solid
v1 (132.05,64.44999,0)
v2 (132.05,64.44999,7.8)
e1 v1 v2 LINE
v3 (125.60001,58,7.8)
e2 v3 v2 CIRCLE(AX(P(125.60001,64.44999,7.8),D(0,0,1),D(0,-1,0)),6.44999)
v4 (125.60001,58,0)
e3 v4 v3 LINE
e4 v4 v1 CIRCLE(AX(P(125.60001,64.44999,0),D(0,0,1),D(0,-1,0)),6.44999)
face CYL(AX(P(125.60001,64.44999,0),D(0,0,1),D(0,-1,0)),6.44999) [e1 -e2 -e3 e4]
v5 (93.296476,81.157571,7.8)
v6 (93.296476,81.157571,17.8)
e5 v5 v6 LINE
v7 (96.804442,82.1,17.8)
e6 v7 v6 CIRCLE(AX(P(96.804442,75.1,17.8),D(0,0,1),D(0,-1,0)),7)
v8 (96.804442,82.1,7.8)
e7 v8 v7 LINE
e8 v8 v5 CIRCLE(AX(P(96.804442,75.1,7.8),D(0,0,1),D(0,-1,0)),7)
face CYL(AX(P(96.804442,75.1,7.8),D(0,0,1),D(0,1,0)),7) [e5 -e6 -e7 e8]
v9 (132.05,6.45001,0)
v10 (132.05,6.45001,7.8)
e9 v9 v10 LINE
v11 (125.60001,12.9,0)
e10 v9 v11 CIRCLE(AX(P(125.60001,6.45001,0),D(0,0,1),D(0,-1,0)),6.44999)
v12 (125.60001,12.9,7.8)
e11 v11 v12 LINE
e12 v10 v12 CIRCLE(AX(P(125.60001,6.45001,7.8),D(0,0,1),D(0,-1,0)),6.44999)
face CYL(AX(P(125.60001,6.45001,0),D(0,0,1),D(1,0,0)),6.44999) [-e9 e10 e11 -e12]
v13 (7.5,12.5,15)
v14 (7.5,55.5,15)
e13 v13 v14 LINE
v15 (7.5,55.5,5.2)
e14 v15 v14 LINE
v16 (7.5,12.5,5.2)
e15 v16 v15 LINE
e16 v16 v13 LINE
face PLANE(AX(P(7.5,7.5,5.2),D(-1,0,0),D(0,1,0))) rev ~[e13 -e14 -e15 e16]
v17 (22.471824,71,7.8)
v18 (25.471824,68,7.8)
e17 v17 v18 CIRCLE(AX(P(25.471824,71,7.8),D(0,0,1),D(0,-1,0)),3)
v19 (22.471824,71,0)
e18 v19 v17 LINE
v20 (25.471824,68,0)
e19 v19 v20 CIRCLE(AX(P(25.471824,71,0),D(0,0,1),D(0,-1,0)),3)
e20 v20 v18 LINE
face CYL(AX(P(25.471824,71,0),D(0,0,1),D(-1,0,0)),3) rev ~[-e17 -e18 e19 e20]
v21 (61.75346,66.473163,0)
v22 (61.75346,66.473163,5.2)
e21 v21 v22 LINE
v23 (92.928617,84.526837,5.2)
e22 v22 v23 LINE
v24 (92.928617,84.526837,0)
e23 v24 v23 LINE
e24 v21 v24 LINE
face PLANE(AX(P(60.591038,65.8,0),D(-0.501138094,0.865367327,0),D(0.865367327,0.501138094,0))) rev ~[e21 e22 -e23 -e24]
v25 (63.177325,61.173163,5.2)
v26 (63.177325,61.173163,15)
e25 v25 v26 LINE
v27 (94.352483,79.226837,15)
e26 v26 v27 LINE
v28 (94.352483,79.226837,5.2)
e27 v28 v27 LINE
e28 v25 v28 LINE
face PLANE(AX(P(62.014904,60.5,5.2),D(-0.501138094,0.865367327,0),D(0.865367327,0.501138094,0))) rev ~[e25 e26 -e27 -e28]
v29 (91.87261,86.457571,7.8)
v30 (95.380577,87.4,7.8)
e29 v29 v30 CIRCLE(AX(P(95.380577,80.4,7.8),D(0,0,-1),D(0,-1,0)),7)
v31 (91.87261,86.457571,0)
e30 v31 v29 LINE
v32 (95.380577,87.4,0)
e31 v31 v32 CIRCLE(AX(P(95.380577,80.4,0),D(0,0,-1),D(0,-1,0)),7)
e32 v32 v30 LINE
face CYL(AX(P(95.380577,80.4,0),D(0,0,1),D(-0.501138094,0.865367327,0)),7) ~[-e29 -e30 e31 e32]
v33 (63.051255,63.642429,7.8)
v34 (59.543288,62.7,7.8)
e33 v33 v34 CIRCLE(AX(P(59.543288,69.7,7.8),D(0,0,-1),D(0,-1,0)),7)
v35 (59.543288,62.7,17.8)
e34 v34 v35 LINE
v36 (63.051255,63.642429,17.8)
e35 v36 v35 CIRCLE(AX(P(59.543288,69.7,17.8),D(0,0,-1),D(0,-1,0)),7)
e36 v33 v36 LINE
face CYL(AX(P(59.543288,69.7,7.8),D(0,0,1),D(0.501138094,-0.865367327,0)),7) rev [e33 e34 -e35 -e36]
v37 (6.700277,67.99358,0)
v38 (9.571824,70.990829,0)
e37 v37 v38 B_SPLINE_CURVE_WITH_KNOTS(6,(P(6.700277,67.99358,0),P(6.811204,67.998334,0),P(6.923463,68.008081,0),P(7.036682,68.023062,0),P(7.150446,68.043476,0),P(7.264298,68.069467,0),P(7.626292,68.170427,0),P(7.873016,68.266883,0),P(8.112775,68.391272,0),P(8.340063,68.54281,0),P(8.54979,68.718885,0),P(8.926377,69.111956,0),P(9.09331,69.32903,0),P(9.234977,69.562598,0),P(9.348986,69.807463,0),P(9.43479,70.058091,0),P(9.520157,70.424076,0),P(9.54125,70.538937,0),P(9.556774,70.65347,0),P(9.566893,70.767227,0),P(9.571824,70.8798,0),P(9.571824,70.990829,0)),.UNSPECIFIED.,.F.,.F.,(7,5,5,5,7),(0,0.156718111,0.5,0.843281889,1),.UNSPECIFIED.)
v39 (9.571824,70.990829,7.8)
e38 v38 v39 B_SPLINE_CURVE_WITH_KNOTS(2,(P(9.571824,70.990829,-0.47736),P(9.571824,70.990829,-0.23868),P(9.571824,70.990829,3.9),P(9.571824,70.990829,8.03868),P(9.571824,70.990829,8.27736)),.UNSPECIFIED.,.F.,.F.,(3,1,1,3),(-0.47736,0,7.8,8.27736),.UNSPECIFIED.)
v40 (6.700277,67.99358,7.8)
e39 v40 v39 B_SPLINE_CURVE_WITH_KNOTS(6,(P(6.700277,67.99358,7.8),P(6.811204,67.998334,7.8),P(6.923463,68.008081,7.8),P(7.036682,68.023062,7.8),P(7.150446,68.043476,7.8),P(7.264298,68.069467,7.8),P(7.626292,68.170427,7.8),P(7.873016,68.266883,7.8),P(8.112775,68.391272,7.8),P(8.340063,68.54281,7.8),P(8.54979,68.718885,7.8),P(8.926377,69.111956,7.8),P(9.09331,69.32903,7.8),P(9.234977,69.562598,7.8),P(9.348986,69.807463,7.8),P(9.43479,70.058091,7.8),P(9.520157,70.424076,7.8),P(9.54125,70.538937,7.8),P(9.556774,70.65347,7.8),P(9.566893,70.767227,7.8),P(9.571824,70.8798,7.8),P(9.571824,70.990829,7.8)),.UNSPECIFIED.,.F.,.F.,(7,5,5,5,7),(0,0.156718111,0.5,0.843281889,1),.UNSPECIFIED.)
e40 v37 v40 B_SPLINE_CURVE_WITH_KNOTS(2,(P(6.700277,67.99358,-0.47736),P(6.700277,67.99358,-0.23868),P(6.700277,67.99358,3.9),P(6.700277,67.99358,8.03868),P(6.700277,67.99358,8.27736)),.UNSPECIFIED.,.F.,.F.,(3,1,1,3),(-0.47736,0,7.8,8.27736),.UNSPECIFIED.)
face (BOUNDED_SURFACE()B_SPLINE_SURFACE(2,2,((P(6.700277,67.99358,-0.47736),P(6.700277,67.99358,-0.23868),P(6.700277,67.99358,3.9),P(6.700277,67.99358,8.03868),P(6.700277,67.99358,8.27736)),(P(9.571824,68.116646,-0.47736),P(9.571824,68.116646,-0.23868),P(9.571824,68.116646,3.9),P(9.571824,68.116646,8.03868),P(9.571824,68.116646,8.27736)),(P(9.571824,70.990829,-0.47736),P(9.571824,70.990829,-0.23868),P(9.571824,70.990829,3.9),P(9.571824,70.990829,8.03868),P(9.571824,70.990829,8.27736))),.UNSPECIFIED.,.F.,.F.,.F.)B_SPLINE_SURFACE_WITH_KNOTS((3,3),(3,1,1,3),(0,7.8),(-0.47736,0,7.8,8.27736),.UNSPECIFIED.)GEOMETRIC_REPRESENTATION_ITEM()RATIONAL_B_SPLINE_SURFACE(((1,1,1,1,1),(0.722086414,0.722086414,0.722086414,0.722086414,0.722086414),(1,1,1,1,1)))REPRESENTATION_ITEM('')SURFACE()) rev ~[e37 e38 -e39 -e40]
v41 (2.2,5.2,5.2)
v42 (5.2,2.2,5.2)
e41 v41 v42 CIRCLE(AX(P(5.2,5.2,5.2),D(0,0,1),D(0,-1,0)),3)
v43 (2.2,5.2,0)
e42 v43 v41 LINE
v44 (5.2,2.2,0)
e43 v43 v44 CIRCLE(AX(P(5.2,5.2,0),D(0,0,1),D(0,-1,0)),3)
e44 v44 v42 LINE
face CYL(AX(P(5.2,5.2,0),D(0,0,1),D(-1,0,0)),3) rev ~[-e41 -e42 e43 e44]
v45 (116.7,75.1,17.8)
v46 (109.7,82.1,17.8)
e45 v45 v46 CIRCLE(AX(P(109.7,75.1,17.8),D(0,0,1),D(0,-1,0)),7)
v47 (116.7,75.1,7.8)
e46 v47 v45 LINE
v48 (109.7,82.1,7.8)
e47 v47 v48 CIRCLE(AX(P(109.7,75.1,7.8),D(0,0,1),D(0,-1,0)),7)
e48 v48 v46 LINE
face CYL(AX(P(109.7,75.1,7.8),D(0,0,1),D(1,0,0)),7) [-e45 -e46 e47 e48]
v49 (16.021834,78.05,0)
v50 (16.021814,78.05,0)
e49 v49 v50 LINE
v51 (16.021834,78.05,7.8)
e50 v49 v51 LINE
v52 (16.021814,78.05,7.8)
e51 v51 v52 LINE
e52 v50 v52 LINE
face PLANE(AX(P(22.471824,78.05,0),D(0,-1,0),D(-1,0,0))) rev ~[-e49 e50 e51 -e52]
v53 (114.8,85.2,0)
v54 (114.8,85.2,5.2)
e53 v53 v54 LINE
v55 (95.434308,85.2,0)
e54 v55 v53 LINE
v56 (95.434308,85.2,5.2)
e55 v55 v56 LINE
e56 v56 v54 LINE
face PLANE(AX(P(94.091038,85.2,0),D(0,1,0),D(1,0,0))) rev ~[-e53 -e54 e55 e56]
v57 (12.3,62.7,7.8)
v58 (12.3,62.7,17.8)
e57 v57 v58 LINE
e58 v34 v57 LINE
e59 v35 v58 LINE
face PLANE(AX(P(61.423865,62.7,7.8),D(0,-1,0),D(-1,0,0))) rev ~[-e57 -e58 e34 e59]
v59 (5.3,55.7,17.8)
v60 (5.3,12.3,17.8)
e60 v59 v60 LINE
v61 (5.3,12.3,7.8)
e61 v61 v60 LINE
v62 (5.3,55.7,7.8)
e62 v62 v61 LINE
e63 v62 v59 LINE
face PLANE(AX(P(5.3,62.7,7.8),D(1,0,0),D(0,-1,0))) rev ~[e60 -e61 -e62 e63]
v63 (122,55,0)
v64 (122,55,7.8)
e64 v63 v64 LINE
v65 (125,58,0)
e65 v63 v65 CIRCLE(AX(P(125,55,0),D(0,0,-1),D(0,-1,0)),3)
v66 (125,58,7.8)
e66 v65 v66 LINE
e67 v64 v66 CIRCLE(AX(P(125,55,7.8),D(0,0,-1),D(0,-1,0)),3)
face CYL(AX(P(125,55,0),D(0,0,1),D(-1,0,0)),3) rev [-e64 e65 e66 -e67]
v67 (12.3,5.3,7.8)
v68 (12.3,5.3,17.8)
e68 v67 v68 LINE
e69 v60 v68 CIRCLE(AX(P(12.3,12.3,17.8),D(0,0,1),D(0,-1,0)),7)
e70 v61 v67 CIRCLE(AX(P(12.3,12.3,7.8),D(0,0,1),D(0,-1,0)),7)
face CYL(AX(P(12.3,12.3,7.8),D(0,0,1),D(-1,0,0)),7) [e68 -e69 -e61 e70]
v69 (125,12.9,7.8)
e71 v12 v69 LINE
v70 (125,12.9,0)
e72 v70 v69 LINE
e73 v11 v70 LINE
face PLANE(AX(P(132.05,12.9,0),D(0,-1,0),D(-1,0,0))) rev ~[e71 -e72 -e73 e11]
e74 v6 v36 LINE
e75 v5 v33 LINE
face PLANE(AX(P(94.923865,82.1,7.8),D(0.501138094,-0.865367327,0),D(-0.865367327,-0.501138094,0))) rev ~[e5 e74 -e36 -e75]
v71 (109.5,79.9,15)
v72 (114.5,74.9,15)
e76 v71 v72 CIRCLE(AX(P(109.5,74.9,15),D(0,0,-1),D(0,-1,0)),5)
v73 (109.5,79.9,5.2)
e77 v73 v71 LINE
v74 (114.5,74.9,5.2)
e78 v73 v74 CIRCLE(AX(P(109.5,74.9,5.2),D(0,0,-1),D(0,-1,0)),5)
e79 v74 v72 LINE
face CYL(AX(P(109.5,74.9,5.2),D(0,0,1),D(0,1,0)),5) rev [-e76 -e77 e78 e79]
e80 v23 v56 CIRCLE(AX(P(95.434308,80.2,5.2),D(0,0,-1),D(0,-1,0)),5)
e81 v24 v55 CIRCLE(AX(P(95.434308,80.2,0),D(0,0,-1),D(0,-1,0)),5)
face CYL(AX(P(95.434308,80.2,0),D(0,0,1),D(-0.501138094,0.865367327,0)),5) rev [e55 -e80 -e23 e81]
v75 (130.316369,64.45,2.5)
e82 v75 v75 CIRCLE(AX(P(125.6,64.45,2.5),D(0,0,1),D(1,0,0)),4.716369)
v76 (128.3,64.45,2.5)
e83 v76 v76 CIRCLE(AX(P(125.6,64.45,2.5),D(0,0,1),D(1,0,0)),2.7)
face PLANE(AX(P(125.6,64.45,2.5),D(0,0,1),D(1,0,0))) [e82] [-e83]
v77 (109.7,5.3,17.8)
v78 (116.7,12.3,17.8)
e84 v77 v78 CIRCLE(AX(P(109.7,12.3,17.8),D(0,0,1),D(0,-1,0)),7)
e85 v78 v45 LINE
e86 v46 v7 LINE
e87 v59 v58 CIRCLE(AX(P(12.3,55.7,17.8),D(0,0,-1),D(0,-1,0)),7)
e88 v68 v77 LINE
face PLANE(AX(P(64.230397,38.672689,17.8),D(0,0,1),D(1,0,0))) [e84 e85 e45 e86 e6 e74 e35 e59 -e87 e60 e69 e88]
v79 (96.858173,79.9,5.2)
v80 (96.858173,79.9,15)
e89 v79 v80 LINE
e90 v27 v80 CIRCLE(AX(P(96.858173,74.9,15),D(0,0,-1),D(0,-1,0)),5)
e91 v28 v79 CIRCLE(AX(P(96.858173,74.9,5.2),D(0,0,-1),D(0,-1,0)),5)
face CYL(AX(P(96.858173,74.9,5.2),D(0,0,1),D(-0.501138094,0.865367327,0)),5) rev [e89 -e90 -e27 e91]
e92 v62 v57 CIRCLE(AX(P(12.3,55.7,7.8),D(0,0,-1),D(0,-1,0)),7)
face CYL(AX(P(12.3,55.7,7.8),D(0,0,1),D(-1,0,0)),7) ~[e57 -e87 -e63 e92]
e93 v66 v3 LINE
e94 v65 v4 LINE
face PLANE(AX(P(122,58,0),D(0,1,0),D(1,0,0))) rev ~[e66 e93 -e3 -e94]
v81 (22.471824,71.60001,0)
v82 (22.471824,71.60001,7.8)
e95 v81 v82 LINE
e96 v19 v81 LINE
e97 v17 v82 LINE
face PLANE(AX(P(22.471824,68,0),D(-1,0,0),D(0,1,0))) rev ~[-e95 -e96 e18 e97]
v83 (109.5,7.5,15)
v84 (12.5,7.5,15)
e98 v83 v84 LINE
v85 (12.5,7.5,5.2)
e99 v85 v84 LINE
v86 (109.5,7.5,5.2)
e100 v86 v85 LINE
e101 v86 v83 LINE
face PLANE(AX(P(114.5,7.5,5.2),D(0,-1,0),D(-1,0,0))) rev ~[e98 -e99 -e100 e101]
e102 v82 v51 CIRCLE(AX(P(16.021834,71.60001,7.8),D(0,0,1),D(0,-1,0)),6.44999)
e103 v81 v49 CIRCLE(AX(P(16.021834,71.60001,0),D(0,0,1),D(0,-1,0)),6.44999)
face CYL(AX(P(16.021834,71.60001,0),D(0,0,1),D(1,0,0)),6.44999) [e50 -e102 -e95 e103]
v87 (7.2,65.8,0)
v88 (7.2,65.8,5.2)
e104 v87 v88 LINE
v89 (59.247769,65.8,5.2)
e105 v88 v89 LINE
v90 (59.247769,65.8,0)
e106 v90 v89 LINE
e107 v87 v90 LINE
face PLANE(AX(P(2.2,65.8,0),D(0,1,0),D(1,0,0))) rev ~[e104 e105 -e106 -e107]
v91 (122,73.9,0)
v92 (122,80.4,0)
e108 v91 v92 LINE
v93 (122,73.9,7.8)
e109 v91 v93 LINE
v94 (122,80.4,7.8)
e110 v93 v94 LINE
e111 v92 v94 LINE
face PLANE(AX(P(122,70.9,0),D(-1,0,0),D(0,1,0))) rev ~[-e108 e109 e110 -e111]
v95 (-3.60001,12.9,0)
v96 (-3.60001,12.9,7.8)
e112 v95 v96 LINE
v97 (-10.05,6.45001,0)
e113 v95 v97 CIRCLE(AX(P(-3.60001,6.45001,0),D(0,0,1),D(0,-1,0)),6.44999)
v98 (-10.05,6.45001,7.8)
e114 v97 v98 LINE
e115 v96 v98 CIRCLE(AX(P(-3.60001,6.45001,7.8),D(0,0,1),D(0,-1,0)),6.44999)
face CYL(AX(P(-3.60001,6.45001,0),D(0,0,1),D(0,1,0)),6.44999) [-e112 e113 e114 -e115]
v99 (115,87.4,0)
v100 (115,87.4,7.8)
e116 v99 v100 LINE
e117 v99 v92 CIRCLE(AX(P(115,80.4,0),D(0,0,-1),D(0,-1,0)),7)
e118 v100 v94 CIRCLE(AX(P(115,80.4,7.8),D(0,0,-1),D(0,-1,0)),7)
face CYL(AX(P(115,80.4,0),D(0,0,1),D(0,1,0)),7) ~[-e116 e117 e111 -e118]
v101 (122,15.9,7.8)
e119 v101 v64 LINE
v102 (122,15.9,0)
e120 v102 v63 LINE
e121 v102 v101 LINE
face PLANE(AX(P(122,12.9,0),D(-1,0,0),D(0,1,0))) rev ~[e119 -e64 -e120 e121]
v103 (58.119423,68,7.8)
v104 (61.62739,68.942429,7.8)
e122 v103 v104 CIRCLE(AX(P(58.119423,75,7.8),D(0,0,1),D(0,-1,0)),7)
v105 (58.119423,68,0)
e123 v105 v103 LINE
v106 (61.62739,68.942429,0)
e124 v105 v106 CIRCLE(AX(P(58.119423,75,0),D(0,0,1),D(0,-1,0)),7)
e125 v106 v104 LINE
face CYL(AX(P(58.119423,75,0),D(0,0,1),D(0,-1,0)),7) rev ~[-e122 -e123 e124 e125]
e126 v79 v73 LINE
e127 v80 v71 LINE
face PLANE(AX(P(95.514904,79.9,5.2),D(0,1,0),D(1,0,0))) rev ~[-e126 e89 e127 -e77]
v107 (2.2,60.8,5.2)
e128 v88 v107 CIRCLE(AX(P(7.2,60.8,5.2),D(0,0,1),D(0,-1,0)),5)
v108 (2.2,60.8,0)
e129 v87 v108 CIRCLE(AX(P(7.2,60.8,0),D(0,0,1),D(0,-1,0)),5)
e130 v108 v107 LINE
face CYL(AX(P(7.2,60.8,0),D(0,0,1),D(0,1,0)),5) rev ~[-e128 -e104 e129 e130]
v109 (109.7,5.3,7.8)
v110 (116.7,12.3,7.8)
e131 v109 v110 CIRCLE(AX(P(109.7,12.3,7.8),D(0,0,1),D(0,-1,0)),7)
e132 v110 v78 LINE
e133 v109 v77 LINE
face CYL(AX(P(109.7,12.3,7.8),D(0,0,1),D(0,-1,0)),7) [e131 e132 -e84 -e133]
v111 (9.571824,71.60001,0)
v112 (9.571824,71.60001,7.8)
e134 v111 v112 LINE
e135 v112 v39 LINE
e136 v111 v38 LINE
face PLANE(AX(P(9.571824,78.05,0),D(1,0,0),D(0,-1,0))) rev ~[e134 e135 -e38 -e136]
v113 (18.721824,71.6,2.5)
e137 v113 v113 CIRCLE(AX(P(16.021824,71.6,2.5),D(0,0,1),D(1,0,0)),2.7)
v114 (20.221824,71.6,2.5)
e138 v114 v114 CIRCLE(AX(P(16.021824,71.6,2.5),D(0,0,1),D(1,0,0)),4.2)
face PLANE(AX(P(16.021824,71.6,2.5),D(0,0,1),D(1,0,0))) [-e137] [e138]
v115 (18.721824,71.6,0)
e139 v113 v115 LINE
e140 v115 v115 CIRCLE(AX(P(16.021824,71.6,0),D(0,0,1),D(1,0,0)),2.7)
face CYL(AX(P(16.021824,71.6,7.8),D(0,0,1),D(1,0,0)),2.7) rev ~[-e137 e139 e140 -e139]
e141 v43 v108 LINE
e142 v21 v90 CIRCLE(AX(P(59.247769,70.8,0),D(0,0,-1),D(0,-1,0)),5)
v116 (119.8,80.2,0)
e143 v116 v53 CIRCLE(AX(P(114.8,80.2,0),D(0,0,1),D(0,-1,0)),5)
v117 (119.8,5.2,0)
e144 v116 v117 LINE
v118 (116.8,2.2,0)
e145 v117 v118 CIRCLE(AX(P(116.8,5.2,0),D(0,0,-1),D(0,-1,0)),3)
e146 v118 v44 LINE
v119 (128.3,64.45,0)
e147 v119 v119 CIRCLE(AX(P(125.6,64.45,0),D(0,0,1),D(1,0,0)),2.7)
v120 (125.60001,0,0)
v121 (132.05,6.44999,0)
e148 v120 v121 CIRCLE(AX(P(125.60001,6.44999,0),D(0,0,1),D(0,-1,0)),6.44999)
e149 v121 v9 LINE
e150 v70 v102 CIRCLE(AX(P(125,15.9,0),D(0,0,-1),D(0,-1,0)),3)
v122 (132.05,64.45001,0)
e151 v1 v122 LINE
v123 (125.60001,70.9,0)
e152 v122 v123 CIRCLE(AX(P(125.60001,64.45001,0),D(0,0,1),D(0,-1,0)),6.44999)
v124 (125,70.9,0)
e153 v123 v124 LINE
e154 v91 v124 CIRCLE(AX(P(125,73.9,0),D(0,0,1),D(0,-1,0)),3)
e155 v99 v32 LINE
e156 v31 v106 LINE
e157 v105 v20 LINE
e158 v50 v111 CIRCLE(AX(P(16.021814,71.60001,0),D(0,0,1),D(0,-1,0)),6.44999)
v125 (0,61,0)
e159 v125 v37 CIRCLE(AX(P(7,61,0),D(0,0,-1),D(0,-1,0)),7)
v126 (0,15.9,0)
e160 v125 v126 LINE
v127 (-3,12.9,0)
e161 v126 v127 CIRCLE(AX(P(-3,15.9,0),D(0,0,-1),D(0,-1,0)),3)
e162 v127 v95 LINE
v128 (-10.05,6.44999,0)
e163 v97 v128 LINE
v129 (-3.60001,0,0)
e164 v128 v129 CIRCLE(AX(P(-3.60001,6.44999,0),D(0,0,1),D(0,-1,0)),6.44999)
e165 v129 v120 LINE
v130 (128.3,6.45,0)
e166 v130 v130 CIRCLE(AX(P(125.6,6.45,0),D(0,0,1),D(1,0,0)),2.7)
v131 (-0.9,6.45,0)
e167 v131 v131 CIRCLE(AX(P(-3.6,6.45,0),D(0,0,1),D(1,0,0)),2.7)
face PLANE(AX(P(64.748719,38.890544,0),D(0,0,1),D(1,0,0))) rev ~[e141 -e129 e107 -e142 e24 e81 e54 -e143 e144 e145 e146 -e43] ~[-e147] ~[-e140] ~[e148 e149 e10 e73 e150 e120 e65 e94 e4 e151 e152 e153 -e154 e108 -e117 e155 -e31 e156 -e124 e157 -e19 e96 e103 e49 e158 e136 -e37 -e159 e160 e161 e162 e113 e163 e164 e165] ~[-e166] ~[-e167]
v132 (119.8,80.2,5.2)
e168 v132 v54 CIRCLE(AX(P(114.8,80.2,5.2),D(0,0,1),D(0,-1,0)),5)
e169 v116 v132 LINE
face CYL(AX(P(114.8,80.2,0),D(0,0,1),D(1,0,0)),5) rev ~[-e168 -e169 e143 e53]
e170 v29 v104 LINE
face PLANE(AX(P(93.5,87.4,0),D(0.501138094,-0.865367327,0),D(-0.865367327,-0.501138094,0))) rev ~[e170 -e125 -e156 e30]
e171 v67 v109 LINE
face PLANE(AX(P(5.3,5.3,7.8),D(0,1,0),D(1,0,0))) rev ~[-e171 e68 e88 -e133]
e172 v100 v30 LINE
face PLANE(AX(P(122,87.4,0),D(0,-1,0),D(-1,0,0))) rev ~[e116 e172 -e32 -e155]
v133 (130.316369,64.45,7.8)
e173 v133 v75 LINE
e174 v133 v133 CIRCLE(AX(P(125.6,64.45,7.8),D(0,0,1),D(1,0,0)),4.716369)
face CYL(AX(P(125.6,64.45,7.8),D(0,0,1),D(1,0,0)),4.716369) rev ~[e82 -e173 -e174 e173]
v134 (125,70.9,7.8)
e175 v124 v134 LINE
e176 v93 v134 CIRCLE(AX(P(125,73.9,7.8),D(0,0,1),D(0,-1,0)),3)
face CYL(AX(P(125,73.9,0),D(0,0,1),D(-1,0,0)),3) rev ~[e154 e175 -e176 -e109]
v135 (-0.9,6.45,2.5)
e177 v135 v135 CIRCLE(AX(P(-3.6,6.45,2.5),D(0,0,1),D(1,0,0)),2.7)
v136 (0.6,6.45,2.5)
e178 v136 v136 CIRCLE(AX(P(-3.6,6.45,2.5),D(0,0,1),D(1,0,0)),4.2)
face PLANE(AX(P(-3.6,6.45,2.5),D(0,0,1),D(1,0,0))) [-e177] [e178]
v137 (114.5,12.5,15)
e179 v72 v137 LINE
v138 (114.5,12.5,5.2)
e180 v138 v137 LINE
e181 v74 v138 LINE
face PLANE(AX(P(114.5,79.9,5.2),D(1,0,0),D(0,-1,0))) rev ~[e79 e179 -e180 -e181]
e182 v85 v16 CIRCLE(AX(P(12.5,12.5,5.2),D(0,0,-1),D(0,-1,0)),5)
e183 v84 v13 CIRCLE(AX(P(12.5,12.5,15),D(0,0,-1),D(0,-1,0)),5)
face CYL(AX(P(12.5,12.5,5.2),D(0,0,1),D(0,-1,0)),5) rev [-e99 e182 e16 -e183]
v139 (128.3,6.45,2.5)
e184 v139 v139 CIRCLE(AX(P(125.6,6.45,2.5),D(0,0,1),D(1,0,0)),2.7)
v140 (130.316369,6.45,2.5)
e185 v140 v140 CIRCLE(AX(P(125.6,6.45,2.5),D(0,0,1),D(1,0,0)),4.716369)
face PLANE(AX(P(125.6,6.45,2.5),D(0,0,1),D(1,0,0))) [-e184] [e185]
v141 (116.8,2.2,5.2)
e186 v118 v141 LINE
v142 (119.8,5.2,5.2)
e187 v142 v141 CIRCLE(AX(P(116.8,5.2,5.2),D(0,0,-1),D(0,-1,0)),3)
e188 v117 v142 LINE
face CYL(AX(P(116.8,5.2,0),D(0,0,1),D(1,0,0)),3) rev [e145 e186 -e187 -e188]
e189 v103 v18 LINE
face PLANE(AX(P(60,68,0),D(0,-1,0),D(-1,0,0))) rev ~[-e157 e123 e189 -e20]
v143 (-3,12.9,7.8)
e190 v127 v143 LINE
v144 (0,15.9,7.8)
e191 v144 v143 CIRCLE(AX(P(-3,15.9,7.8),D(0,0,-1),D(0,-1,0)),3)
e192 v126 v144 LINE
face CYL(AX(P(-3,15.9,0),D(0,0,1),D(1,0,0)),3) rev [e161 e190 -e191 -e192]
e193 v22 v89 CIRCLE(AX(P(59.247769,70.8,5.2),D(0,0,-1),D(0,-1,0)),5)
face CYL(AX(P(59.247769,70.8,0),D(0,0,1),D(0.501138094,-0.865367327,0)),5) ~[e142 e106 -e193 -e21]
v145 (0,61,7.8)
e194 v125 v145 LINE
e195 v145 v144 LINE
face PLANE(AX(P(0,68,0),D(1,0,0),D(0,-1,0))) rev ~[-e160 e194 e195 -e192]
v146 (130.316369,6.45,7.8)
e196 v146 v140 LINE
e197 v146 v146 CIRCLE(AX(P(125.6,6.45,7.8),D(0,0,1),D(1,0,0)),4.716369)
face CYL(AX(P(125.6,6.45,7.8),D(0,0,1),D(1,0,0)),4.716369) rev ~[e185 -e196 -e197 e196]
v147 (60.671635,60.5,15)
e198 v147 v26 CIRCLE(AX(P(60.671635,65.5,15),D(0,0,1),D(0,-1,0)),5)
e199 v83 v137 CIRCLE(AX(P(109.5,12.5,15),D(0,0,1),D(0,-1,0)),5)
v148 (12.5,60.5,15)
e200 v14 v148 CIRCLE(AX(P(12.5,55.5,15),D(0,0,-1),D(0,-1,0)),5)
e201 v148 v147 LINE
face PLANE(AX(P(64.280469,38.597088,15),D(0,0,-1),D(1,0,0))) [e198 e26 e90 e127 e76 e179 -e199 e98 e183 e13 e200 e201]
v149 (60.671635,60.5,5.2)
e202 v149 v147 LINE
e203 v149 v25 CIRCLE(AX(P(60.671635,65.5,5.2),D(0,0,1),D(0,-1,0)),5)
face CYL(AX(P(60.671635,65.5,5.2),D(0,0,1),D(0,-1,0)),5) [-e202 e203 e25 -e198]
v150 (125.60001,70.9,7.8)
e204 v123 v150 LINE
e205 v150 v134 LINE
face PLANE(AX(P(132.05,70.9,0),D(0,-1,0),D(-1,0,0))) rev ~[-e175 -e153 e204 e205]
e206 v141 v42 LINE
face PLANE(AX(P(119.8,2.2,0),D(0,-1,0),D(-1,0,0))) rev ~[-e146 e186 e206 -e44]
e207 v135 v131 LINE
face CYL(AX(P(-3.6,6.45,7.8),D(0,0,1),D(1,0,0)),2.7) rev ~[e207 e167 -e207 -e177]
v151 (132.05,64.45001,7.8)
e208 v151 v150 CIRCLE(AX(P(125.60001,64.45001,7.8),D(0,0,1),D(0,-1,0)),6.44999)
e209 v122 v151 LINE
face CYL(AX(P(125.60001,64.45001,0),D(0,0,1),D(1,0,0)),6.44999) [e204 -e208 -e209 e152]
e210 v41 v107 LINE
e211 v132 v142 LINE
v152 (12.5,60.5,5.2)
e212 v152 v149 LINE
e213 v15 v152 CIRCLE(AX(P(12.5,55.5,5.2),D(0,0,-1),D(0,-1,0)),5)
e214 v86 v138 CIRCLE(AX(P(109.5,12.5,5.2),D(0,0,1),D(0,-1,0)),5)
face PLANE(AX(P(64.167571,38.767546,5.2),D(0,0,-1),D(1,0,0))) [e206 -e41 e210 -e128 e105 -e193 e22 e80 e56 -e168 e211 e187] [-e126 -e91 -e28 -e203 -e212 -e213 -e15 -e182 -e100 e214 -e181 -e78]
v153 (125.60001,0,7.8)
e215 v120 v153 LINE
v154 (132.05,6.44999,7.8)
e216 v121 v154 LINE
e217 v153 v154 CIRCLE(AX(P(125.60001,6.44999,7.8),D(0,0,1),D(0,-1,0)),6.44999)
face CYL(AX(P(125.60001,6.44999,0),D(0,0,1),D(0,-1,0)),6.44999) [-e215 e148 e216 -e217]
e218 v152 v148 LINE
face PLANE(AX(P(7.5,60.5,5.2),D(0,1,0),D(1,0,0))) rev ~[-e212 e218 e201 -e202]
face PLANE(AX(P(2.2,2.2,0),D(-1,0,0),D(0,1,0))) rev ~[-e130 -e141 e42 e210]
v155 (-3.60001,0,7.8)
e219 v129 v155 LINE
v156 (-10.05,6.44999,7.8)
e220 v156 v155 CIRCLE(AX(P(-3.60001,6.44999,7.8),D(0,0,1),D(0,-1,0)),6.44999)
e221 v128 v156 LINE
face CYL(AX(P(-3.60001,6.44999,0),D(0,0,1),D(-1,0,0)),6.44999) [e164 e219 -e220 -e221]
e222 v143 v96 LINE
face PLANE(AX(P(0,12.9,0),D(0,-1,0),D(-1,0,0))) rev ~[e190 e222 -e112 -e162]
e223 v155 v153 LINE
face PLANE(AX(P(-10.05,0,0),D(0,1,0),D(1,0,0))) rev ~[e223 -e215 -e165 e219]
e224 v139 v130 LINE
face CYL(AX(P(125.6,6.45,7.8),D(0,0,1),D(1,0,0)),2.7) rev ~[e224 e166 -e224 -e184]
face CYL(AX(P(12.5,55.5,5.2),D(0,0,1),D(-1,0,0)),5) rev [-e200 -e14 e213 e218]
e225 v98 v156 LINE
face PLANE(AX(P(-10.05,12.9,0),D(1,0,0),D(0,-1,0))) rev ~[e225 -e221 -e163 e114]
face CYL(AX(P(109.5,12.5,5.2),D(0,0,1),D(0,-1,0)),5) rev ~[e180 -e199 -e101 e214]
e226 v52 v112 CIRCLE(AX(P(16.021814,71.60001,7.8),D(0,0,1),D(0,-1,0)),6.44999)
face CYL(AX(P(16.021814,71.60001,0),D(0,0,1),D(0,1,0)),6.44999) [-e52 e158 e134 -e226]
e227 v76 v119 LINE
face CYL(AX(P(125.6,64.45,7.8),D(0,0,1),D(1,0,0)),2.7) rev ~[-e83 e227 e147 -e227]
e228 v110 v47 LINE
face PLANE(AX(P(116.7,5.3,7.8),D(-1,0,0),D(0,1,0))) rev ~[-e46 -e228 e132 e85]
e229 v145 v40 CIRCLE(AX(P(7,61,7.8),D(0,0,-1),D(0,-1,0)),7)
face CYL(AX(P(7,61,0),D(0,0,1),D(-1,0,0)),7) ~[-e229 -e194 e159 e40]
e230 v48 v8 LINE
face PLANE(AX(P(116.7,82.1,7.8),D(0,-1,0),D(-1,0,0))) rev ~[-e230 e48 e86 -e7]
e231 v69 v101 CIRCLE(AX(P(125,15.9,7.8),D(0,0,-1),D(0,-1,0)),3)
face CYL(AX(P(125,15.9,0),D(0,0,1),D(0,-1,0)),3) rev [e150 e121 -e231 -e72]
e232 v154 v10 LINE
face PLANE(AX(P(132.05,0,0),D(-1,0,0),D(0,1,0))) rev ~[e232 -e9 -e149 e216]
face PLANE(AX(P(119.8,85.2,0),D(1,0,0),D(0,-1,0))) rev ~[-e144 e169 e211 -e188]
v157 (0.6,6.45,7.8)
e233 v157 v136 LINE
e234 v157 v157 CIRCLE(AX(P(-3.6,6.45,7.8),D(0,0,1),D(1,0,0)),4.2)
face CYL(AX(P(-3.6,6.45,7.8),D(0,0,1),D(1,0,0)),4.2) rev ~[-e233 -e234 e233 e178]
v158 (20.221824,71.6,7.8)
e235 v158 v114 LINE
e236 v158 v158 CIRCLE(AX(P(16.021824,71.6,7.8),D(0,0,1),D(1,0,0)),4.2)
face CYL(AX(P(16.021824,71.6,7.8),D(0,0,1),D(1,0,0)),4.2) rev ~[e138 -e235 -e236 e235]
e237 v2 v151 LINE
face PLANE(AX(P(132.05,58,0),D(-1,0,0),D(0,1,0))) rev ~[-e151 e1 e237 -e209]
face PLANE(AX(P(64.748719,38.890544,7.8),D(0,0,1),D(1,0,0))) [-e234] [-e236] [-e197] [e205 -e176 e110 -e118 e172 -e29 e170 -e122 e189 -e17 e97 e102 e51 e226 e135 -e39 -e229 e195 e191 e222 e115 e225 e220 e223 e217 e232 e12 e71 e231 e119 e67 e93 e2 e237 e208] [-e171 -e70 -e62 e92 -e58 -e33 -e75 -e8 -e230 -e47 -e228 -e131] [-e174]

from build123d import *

# Parameters (mm, degrees)
F1_DEPTH  = 7.8
F2_R      = 6.44999
F3_R      = 2.7
F4_DEPTH  = 7.801
F5_R      = 4.2
F5_R_2    = 4.7163688055
F6_DEPTH  = 5.3
F8_DEPTH  = 10
F10_DEPTH = 5.2
F12_DEPTH = 9.8
F13_R     = 5
F14_R     = 7
F15_R     = 3
F16_R     = 3


# Not quite as in the source:
# - a fillet or chamfer is up to 0.001 mm smaller than in the source, because OpenCascade refuses the exact size


with BuildPart() as f1:
    # F0 (on Top) → F1 (new body)
    with BuildSketch(Plane.XY):
        Polygon((0, 68), (0, 12.9), (-10.05, 12.9), (-10.05, 0), (0, 0), (122, 0), (132.05, 0), (132.05, 12.9), (122, 12.9), (122, 58), (132.05, 58), (132.05, 70.9), (122, 70.9), (122, 87.4), (93.5, 87.4), (60, 68), (22.4718242228, 68), (22.4718242228, 78.05), (9.5718242228, 78.05), (9.5718242228, 68), align=None)
    extrude(amount=F1_DEPTH)

    # F2 (radius 6.45 in the source; OpenCascade refuses exactly that, so slightly less here)
    f2_edges = [f1.edges().sort_by_distance(p)[0] for p in [
        (-10.05, 0, 3.9),
        (-10.05, 12.9, 3.9),
        (9.571824, 78.05, 3.9),
        (22.471824, 78.05, 3.9),
        (132.05, 70.9, 3.9),
        (132.05, 58, 3.9),
        (132.05, 12.9, 3.9),
        (132.05, 0, 3.9),
    ]]
    fillet(f2_edges, radius=F2_R)

    # F3 (on face) → F4 (cut, through all)
    with BuildSketch(Plane.XY.offset(7.8)):
        with Locations((-3.6, 6.45)):
            Circle(F3_R)
        with Locations((16.0218242228, 71.6)):
            Circle(F3_R)
        with Locations((125.6, 64.45)):
            Circle(F3_R)
        with Locations((125.6, 6.45)):
            Circle(F3_R)
    extrude(amount=-F4_DEPTH, mode=Mode.SUBTRACT)

    # F5 (on face) → F6 (cut)
    with BuildSketch(Plane.XY.offset(7.8)):
        with Locations((-3.6, 6.45)):
            Circle(F5_R)
        with Locations((16.0218242228, 71.6)):
            Circle(F5_R)
        with Locations((125.6, 64.45)):
            Circle(F5_R_2)
        with Locations((125.6, 6.45)):
            Circle(F5_R_2)
    extrude(amount=-F6_DEPTH, mode=Mode.SUBTRACT)

    # F7 (on face) → F8 (join)
    with BuildSketch(Plane.XY.offset(7.8)):
        Polygon((5.3, 62.7), (5.3, 5.3), (116.7, 5.3), (116.7, 82.1), (94.9238653477, 82.1), (61.4238653477, 62.7), align=None)
    extrude(amount=F8_DEPTH)

    # F9 (on face) → F10 (cut)
    with BuildSketch(Plane(origin=(0, 0, 0), x_dir=(1, 0, 0), z_dir=(0, 0, -1))):
        Polygon((94.0910384462, -85.2), (119.8, -85.2), (119.8, -2.2), (2.2, -2.2), (2.2, -65.8), (60.5910384462, -65.8), align=None)
    extrude(amount=-F10_DEPTH, mode=Mode.SUBTRACT)

    # F11 (on face) → F12 (cut)
    with BuildSketch(Plane(origin=(0, 0, 5.2), x_dir=(1, 0, 0), z_dir=(0, 0, -1))):
        Polygon((114.5, -7.5), (7.5, -7.5), (7.5, -60.5), (62.0149037939, -60.5), (95.5149037939, -79.9), (114.5, -79.9), align=None)
    extrude(amount=-F12_DEPTH, mode=Mode.SUBTRACT)

    # F13
    f13_edges = [f1.edges().sort_by_distance(p)[0] for p in [
        (114.5, 79.9, 10.1),
        (119.8, 85.2, 2.6),
        (7.5, 60.5, 10.1),
        (2.2, 65.8, 2.6),
        (114.5, 7.5, 10.1),
        (7.5, 7.5, 10.1),
        (95.514904, 79.9, 10.1),
        (62.014904, 60.5, 10.1),
        (60.591038, 65.8, 2.6),
        (94.091038, 85.2, 2.6),
    ]]
    fillet(f13_edges, radius=F13_R)

    # F14
    f14_edges = [f1.edges().sort_by_distance(p)[0] for p in [
        (122, 87.4, 3.9),
        (93.5, 87.4, 3.9),
        (60, 68, 3.9),
        (61.423865, 62.7, 12.8),
        (94.923865, 82.1, 12.8),
        (116.7, 82.1, 12.8),
        (116.7, 5.3, 12.8),
        (5.3, 5.3, 12.8),
        (5.3, 62.7, 12.8),
        (0, 68, 3.9),
    ]]
    fillet(f14_edges, radius=F14_R)

    # F15
    f15_edges = [f1.edges().sort_by_distance(p)[0] for p in [
        (119.8, 2.2, 2.6),
        (2.2, 2.2, 2.6),
    ]]
    fillet(f15_edges, radius=F15_R)

    # F16
    f16_edges = [f1.edges().sort_by_distance(p)[0] for p in [
        (0, 12.9, 3.9),
        (9.571824, 68, 3.9),
        (22.471824, 68, 3.9),
        (122, 70.9, 3.9),
        (122, 58, 3.9),
        (122, 12.9, 3.9),
    ]]
    fillet(f16_edges, radius=F16_R)


solid = f1.part
